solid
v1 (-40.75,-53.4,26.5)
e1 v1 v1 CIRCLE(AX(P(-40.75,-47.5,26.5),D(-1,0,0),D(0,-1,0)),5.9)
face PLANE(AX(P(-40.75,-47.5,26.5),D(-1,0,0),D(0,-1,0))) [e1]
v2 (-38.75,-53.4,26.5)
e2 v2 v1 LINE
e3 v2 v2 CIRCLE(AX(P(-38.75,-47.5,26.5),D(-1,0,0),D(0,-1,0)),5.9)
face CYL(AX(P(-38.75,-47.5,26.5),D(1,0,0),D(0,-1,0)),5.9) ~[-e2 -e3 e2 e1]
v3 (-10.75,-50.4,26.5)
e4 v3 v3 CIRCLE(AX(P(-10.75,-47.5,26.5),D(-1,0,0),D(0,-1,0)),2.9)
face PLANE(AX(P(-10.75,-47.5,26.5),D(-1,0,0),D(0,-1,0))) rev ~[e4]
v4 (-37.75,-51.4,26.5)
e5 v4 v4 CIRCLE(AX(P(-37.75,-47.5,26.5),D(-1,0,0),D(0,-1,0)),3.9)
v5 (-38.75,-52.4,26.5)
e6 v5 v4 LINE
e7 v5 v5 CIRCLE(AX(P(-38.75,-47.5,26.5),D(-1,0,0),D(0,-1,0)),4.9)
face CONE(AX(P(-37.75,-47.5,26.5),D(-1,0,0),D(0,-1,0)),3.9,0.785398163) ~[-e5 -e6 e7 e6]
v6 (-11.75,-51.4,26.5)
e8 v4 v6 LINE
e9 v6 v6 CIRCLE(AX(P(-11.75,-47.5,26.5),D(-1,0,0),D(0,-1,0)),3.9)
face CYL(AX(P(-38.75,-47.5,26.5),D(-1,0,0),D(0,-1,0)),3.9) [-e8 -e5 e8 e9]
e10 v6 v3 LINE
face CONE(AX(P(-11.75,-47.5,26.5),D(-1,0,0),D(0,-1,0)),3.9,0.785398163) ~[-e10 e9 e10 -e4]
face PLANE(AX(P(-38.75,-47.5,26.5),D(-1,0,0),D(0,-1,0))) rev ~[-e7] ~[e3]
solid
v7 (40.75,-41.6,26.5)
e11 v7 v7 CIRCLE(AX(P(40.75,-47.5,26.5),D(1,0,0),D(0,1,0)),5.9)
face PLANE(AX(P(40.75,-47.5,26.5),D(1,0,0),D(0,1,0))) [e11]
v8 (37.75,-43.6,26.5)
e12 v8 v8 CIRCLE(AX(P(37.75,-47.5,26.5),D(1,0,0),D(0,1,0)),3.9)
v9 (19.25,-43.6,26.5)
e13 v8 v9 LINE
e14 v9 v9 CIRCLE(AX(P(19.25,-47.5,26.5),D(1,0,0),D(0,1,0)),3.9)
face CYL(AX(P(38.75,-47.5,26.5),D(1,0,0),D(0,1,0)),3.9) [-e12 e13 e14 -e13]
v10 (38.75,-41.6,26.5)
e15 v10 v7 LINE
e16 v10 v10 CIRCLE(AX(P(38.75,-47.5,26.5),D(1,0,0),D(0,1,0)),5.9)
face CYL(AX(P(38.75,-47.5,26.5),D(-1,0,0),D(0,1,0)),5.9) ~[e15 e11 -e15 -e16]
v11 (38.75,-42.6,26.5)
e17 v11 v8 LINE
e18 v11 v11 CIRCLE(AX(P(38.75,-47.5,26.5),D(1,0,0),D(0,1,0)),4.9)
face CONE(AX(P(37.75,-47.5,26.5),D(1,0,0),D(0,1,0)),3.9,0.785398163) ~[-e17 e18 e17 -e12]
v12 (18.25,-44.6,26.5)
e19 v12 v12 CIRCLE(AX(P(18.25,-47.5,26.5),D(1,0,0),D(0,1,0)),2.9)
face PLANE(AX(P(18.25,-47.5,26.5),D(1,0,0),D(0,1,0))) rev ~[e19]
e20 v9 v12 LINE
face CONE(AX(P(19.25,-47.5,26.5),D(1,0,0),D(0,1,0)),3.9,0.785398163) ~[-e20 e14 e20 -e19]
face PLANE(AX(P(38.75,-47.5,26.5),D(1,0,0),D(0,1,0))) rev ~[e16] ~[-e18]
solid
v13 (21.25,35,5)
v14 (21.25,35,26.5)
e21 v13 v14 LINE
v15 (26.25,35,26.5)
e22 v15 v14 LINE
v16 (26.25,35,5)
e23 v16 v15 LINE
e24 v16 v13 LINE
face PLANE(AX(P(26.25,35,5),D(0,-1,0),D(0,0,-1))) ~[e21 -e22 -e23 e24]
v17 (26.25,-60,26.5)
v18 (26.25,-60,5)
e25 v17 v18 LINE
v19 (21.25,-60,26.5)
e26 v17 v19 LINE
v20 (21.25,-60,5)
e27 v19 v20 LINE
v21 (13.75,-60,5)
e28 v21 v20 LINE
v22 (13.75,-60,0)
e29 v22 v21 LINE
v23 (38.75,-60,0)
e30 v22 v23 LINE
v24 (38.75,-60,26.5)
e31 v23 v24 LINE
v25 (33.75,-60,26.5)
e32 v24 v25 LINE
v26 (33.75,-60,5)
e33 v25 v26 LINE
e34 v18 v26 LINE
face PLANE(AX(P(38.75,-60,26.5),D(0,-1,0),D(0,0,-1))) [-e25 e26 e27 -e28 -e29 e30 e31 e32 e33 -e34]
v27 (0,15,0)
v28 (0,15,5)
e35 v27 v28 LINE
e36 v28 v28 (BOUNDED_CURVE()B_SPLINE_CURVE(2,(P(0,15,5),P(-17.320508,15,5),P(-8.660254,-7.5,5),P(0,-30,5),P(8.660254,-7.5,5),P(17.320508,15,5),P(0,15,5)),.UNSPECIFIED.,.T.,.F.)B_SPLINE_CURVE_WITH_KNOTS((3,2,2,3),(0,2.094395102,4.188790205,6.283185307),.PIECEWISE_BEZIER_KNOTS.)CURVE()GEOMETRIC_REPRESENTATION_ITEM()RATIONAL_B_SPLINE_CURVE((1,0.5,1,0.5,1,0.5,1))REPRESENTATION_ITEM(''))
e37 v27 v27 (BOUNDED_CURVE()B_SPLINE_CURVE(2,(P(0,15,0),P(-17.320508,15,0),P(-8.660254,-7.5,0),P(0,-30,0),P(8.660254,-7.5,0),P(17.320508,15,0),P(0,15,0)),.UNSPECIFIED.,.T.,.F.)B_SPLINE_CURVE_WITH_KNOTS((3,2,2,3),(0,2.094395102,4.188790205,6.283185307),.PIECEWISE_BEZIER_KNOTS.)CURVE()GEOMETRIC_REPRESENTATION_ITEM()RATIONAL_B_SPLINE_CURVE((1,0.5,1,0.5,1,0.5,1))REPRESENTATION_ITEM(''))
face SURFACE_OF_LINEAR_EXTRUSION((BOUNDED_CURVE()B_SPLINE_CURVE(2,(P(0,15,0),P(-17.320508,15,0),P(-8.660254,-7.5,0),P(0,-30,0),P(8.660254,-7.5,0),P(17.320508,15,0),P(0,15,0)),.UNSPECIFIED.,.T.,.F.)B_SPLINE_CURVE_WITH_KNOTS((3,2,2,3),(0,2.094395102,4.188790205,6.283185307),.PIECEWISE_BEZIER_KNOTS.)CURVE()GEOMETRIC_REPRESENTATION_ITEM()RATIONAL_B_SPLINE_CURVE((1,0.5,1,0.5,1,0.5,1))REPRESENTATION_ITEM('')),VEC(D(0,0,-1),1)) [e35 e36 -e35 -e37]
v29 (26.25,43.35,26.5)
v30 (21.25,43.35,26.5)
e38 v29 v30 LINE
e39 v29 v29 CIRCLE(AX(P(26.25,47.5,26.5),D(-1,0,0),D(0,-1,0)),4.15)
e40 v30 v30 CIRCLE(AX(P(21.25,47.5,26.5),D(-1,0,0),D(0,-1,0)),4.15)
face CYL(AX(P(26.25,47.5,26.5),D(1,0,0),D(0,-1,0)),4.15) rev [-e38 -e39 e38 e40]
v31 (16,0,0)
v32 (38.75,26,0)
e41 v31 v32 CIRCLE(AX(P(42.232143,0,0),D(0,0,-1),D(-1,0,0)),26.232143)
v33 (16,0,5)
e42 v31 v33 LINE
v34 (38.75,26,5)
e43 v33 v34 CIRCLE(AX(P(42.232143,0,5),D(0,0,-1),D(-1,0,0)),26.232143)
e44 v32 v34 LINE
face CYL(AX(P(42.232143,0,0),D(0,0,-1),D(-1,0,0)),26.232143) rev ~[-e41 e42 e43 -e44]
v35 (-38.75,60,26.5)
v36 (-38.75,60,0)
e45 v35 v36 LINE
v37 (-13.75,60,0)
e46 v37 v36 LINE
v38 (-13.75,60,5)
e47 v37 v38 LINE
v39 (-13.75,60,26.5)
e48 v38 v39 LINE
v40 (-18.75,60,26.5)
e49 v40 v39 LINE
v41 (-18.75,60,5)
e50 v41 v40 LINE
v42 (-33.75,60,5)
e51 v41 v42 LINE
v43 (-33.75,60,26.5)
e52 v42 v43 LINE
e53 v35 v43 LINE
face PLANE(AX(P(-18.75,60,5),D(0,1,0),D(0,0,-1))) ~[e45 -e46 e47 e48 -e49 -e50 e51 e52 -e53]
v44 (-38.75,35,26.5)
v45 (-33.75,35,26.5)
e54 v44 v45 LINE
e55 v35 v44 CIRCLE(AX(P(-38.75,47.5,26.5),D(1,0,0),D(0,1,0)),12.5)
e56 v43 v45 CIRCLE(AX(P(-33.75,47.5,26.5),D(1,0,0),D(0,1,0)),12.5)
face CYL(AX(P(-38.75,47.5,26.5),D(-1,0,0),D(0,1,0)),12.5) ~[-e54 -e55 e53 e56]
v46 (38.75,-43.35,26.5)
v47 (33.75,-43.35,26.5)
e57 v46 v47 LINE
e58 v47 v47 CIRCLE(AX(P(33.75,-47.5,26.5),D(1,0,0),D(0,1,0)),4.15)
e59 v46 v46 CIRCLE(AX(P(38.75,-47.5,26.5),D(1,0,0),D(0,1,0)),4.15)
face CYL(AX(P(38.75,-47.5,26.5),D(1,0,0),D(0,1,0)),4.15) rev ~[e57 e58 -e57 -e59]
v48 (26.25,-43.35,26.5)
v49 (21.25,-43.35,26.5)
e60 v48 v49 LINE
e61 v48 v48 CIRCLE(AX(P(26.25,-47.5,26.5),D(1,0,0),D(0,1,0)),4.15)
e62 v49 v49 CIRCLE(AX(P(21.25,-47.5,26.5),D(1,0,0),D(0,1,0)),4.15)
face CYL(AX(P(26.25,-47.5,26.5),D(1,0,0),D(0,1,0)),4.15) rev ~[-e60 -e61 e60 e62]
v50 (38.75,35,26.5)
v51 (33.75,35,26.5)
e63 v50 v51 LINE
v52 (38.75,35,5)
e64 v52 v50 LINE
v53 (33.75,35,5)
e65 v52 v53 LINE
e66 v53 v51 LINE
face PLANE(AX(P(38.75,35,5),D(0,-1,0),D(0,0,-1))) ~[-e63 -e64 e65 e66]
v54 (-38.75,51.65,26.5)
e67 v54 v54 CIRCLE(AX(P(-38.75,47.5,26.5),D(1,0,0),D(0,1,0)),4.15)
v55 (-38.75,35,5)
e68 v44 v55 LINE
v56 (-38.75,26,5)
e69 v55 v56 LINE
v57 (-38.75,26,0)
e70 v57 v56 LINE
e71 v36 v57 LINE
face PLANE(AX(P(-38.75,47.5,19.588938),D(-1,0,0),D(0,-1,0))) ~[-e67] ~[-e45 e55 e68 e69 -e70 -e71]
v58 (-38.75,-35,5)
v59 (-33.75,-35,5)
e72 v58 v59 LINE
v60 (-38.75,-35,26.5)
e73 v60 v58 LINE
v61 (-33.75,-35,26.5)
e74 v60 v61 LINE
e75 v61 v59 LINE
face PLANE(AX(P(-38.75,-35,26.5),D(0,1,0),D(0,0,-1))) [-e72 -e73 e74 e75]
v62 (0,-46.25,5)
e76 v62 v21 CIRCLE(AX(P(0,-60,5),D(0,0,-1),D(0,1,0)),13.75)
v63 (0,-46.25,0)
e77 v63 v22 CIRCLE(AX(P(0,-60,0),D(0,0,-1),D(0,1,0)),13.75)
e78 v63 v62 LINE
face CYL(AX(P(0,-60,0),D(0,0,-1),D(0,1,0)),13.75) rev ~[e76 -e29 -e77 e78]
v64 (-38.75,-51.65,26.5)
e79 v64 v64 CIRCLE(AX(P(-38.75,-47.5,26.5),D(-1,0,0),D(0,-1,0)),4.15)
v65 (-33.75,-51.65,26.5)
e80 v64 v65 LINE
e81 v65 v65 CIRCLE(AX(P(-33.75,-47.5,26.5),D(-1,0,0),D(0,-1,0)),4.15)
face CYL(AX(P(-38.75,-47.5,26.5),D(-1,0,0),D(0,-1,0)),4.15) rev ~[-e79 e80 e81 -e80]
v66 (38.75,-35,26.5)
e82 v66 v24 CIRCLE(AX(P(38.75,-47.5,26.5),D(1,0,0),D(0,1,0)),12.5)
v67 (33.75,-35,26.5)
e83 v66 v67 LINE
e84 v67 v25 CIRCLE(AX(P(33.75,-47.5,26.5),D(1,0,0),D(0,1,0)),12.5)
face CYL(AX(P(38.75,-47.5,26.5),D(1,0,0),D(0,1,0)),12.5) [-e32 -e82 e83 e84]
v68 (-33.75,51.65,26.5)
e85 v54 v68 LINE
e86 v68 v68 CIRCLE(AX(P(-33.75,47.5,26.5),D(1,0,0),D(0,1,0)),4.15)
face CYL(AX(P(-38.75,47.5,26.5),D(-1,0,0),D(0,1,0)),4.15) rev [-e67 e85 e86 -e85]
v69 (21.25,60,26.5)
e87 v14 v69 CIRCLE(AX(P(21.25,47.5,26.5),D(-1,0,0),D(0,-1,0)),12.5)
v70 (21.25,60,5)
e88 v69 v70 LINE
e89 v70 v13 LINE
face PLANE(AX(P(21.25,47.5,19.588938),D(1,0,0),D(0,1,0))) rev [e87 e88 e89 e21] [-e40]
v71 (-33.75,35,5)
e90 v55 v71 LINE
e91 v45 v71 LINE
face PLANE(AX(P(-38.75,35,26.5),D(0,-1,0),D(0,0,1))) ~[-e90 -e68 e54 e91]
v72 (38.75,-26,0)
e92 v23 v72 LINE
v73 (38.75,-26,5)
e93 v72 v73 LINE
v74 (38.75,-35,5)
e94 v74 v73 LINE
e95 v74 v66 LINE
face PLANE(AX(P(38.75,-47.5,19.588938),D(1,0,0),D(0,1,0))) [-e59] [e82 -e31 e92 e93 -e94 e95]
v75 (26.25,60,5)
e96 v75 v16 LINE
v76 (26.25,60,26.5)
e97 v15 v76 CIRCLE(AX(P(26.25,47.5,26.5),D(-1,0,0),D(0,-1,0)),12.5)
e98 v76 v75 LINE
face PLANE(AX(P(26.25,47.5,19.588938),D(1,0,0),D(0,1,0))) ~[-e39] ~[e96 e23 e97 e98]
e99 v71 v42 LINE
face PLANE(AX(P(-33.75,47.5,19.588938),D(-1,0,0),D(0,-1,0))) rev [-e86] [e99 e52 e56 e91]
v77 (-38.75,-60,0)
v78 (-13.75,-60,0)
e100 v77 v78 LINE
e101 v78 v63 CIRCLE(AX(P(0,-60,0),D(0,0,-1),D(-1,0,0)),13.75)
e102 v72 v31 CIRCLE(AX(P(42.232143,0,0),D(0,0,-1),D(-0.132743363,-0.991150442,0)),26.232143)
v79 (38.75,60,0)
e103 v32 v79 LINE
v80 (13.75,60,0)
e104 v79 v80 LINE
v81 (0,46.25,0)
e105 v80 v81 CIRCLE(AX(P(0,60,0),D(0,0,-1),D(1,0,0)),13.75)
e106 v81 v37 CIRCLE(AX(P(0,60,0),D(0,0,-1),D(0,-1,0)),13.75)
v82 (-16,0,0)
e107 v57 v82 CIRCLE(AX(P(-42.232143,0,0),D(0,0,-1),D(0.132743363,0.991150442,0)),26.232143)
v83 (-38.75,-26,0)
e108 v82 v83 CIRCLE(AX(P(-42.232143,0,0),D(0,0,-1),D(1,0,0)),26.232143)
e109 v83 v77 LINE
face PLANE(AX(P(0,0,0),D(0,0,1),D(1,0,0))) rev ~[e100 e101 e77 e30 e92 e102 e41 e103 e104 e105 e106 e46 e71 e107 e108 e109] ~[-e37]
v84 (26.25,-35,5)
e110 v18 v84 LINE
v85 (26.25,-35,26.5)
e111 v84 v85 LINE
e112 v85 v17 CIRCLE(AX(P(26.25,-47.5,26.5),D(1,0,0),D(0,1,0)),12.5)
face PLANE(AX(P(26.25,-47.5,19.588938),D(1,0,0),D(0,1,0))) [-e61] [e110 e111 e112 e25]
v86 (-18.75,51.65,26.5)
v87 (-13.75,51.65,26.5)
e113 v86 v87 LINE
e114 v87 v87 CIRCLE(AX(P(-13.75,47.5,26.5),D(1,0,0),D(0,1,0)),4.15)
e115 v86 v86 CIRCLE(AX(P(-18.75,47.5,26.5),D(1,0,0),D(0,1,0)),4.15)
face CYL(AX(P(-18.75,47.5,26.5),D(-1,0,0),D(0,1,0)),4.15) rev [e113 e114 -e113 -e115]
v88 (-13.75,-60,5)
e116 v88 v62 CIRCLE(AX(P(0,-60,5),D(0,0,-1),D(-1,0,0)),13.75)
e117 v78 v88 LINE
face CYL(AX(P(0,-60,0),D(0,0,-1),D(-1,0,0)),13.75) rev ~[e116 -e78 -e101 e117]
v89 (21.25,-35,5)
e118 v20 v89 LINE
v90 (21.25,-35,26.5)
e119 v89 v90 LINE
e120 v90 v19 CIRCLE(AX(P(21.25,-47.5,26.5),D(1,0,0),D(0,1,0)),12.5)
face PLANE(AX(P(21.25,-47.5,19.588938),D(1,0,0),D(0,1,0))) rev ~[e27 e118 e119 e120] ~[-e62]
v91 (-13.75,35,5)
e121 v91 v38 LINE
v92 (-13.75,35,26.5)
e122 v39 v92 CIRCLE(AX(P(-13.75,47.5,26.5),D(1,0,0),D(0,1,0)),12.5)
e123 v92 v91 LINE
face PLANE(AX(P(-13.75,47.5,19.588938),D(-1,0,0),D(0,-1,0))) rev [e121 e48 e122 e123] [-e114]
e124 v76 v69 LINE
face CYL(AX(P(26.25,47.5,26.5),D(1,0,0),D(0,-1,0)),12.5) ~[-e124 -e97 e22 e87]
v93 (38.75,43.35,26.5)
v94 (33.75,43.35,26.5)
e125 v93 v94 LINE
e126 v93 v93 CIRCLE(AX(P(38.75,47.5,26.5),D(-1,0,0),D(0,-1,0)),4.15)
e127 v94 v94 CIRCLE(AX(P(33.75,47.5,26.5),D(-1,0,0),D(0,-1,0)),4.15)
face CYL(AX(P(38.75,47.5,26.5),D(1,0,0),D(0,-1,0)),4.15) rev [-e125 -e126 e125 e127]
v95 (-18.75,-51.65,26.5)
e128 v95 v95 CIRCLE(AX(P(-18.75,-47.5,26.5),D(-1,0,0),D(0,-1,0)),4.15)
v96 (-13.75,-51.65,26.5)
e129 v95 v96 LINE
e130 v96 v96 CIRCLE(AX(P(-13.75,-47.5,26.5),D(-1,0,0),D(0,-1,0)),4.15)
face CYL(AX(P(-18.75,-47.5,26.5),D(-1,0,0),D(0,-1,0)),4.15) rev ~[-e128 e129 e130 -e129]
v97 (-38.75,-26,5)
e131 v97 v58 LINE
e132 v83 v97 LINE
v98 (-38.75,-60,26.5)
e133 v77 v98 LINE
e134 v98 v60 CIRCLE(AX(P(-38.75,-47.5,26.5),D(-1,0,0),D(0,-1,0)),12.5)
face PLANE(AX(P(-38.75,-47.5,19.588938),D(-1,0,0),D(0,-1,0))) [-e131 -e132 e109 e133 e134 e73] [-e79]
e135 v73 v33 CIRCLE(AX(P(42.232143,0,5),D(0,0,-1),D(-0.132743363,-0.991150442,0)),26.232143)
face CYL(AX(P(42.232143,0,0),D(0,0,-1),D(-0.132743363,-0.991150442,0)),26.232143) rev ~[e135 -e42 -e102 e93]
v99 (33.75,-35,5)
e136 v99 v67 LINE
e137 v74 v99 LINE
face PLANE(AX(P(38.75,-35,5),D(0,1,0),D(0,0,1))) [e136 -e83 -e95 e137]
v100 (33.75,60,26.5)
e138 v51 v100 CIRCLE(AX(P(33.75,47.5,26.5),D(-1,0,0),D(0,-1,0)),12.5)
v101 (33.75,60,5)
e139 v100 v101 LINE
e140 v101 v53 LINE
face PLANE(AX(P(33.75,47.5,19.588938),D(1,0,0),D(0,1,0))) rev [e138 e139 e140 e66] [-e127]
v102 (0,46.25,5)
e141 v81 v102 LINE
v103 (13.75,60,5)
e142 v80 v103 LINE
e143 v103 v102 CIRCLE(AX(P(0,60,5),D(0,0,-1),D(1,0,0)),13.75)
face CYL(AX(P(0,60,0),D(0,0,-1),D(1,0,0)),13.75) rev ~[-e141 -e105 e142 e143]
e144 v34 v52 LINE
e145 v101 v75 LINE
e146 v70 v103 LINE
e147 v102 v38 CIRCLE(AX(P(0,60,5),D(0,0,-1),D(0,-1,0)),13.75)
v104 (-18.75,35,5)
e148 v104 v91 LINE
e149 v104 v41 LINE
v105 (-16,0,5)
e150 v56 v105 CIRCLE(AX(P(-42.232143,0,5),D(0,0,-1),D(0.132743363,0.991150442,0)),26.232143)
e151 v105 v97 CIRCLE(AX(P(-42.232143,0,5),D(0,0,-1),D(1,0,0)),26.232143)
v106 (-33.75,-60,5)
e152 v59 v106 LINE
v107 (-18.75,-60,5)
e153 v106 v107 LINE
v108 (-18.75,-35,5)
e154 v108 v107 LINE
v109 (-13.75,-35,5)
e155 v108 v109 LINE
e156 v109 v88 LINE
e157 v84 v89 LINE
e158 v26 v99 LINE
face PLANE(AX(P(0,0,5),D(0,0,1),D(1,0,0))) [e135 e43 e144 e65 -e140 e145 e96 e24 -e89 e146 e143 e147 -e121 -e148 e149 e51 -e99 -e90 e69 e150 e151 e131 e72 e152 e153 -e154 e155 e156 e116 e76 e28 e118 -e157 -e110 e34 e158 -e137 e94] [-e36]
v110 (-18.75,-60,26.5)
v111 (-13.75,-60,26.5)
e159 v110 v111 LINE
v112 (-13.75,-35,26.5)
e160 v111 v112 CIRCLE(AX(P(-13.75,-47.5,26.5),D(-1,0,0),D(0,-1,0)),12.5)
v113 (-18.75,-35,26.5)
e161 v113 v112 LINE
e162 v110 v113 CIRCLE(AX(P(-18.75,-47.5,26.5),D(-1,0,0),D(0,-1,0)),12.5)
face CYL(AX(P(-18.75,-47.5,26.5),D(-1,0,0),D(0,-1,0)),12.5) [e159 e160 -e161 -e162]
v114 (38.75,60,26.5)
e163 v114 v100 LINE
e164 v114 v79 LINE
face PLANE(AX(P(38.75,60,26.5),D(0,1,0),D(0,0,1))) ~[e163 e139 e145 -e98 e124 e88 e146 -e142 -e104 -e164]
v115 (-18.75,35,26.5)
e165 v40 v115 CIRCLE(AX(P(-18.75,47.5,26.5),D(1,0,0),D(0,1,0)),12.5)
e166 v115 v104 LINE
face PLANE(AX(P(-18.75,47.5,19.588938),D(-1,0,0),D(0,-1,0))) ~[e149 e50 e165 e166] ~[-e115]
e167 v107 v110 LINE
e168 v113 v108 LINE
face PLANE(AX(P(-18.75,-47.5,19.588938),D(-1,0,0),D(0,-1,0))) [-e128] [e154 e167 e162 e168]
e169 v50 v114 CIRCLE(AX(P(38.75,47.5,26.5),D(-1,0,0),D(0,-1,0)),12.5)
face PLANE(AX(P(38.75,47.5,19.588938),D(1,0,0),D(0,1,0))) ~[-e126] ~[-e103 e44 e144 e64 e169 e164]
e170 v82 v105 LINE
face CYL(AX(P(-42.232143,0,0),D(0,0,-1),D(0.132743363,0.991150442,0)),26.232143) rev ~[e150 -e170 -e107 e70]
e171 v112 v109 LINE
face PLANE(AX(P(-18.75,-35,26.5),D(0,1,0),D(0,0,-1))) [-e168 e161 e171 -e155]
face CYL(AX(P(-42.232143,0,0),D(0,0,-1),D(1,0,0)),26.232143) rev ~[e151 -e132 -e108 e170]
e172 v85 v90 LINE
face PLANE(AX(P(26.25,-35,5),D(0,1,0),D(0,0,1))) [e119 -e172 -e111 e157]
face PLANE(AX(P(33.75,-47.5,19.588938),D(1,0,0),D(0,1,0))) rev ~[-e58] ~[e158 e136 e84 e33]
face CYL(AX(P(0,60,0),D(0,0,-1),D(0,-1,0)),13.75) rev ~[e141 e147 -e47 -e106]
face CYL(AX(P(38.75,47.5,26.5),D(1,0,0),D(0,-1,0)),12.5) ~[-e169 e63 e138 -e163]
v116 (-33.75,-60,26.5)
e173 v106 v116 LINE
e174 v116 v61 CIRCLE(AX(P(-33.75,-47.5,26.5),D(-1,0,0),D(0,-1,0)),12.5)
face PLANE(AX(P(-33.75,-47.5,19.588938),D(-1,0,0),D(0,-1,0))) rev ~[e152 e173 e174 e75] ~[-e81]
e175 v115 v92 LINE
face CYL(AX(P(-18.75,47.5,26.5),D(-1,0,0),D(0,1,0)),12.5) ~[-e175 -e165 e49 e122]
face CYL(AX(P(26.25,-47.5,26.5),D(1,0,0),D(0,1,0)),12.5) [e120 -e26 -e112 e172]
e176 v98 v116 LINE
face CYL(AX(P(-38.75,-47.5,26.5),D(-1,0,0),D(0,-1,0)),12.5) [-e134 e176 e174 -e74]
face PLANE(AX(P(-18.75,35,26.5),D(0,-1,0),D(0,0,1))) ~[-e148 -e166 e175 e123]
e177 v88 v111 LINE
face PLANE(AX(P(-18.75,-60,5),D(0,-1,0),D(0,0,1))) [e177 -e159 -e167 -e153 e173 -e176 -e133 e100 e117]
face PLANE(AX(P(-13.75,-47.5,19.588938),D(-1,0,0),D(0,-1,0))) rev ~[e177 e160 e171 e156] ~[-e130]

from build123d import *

# Parameters (mm, degrees)
F3_DEPTH   = 5
F6_R       = 4.15
F7_DEPTH   = 5
F9_R       = 4.15
F10_DEPTH  = 5
F13_R      = 4.15
F14_DEPTH  = 5
F15_R      = 4.15
F16_DEPTH  = 5
F17_R      = 3.9
F18_DEPTH  = 20.5
F19_R      = 5.9
F20_DEPTH  = 2
F21_R      = 3.9
F22_DEPTH  = 28
F23_R      = 5.9
F24_DEPTH  = 2
F25_SIZE   = 1
F25_2_SIZE = 1


# Not quite as in the source:
# - a pattern or mirror of a feature is missing from the dataset's text; its kind, count and spacing are read off the source's solid


with BuildPart() as f3:
    # F2 (on Top) → F3 (new body)
    with BuildSketch(Plane.XY):
        with BuildLine():
            ThreePointArc((38.75, -26), (22.4904434906, -17.2739869457), (16, 0))
            ThreePointArc((16, 0), (22.4904434906, 17.2739869457), (38.75, 26))
            Line((38.75, 26), (38.75, 60))
            Line((38.75, 60), (13.75, 60))
            ThreePointArc((13.75, 60), (9.7227182413, 50.2772817587), (0, 46.25))
            ThreePointArc((0, 46.25), (-9.7227182413, 50.2772817587), (-13.75, 60))
            Line((-13.75, 60), (-38.75, 60))
            Line((-38.75, 60), (-38.75, 26))
            ThreePointArc((-38.75, 26), (-22.4904434906, 17.2739869457), (-16, 0))
            ThreePointArc((-16, 0), (-22.4904434906, -17.2739869457), (-38.75, -26))
            Line((-38.75, -26), (-38.75, -60))
            Line((-38.75, -60), (-13.75, -60))
            ThreePointArc((-13.75, -60), (-9.7227182413, -50.2772817587), (0, -46.25))
            ThreePointArc((0, -46.25), (9.7227182413, -50.2772817587), (13.75, -60))
            Line((13.75, -60), (38.75, -60))
            Line((38.75, -60), (38.75, -26))
        make_face()
        with BuildLine():
            add(Edge.make_bspline(
                [(0, 15), (-17.3205080757, 15), (-8.6602540378, -7.5), (0, -30), (8.6602540378, -7.5), (17.3205080757, 15), (0, 15)],
                knots=[0, 0, 0, 2.0943951024, 2.0943951024, 4.1887902048, 4.1887902048, 6.2831853072, 6.2831853072, 6.2831853072], degree=2, weights=[1, 0.5, 1, 0.5, 1, 0.5, 1]))
        make_face(mode=Mode.SUBTRACT)
    extrude(amount=F3_DEPTH)

    # F6 (on offset) → F7 (join)
    with BuildSketch(Plane.YZ.offset(38.75)):
        with BuildLine():
            Line((-60, 5), (-35, 5))
            Line((-35, 5), (-35, 26.5))
            ThreePointArc((-35, 26.5), (-47.5, 39), (-60, 26.5))
            Line((-60, 26.5), (-60, 5))
        make_face()
        with Locations((-47.5, 26.5)):
            Circle(F6_R, mode=Mode.SUBTRACT)
    f7 = extrude(amount=-F7_DEPTH)

    # F7_copies: F7 across plane
    add(f7.mirror(Plane.ZX))

    # F9 (on offset) → F10 (join)
    with BuildSketch(Plane.YZ.offset(26.25)):
        with BuildLine():
            Line((-60, 5), (-35, 5))
            Line((-35, 5), (-35, 26.5))
            ThreePointArc((-35, 26.5), (-47.5, 39), (-60, 26.5))
            Line((-60, 26.5), (-60, 5))
        make_face()
        with Locations((-47.5, 26.5)):
            Circle(F9_R, mode=Mode.SUBTRACT)
    f10 = extrude(amount=-F10_DEPTH)

    # F10_copies: F10 across plane
    add(f10.mirror(Plane.ZX))

    # F13 (on offset) → F14 (join)
    with BuildSketch(Plane(origin=(-38.75, 0, 0), x_dir=(0, -1, 0), z_dir=(-1, 0, 0))):
        with BuildLine():
            Line((35, 26.5), (35, 5))
            Line((35, 5), (60, 5))
            Line((60, 5), (60, 26.5))
            ThreePointArc((60, 26.5), (47.5, 39), (35, 26.5))
        make_face()
        with Locations((47.5, 26.5)):
            Circle(F13_R, mode=Mode.SUBTRACT)
    f14 = extrude(amount=-F14_DEPTH)

    # F14_copies: F14 across plane
    add(f14.mirror(Plane.ZX))

    # F15 (on offset) → F16 (join)
    with BuildSketch(Plane(origin=(-18.75, 0, 0), x_dir=(0, -1, 0), z_dir=(-1, 0, 0))):
        with BuildLine():
            Line((35, 26.5), (35, 5))
            Line((35, 5), (60, 5))
            Line((60, 5), (60, 26.5))
            ThreePointArc((60, 26.5), (47.5, 39), (35, 26.5))
        make_face()
        with Locations((47.5, 26.5)):
            Circle(F15_R, mode=Mode.SUBTRACT)
    f16 = extrude(amount=-F16_DEPTH)

    # F16_copies: F16 across plane
    add(f16.mirror(Plane.ZX))


with BuildPart() as f18:
    # F17 (on face) → F18 (new body, through all)
    with BuildSketch(Plane.YZ.offset(38.75)):
        with Locations((-47.5, 26.5)):
            Circle(F17_R)
    extrude(amount=-F18_DEPTH)

    # F19 (on face) → F20 (join)
    with BuildSketch(Plane.YZ.offset(38.75)):
        with Locations((-47.5, 26.5)):
            Circle(F19_R)
    extrude(amount=F20_DEPTH)

    # F25
    f25_edges = [f18.edges().sort_by_distance(p)[0] for p in [
        (18.25, -51.4, 26.5),
        (38.75, -51.4, 26.5),
    ]]
    chamfer(f25_edges, length=F25_SIZE)


with BuildPart() as f22:
    # F21 (on face) → F22 (new body, through all)
    with BuildSketch(Plane(origin=(-38.75, 0, 0), x_dir=(0, -1, 0), z_dir=(-1, 0, 0))):
        with Locations((47.5, 26.5)):
            Circle(F21_R)
    extrude(amount=-F22_DEPTH)

    # F23 (on face) → F24 (join)
    with BuildSketch(Plane(origin=(-38.75, 0, 0), x_dir=(0, -1, 0), z_dir=(-1, 0, 0))):
        with Locations((47.5, 26.5)):
            Circle(F23_R)
    extrude(amount=F24_DEPTH)

    # F25#2
    f25_2_edges = [f22.edges().sort_by_distance(p)[0] for p in [
        (-38.75, -43.6, 26.5),
        (-10.75, -43.6, 26.5),
    ]]
    chamfer(f25_2_edges, length=F25_2_SIZE)


solid = Compound([f3.part, f18.part, f22.part])
